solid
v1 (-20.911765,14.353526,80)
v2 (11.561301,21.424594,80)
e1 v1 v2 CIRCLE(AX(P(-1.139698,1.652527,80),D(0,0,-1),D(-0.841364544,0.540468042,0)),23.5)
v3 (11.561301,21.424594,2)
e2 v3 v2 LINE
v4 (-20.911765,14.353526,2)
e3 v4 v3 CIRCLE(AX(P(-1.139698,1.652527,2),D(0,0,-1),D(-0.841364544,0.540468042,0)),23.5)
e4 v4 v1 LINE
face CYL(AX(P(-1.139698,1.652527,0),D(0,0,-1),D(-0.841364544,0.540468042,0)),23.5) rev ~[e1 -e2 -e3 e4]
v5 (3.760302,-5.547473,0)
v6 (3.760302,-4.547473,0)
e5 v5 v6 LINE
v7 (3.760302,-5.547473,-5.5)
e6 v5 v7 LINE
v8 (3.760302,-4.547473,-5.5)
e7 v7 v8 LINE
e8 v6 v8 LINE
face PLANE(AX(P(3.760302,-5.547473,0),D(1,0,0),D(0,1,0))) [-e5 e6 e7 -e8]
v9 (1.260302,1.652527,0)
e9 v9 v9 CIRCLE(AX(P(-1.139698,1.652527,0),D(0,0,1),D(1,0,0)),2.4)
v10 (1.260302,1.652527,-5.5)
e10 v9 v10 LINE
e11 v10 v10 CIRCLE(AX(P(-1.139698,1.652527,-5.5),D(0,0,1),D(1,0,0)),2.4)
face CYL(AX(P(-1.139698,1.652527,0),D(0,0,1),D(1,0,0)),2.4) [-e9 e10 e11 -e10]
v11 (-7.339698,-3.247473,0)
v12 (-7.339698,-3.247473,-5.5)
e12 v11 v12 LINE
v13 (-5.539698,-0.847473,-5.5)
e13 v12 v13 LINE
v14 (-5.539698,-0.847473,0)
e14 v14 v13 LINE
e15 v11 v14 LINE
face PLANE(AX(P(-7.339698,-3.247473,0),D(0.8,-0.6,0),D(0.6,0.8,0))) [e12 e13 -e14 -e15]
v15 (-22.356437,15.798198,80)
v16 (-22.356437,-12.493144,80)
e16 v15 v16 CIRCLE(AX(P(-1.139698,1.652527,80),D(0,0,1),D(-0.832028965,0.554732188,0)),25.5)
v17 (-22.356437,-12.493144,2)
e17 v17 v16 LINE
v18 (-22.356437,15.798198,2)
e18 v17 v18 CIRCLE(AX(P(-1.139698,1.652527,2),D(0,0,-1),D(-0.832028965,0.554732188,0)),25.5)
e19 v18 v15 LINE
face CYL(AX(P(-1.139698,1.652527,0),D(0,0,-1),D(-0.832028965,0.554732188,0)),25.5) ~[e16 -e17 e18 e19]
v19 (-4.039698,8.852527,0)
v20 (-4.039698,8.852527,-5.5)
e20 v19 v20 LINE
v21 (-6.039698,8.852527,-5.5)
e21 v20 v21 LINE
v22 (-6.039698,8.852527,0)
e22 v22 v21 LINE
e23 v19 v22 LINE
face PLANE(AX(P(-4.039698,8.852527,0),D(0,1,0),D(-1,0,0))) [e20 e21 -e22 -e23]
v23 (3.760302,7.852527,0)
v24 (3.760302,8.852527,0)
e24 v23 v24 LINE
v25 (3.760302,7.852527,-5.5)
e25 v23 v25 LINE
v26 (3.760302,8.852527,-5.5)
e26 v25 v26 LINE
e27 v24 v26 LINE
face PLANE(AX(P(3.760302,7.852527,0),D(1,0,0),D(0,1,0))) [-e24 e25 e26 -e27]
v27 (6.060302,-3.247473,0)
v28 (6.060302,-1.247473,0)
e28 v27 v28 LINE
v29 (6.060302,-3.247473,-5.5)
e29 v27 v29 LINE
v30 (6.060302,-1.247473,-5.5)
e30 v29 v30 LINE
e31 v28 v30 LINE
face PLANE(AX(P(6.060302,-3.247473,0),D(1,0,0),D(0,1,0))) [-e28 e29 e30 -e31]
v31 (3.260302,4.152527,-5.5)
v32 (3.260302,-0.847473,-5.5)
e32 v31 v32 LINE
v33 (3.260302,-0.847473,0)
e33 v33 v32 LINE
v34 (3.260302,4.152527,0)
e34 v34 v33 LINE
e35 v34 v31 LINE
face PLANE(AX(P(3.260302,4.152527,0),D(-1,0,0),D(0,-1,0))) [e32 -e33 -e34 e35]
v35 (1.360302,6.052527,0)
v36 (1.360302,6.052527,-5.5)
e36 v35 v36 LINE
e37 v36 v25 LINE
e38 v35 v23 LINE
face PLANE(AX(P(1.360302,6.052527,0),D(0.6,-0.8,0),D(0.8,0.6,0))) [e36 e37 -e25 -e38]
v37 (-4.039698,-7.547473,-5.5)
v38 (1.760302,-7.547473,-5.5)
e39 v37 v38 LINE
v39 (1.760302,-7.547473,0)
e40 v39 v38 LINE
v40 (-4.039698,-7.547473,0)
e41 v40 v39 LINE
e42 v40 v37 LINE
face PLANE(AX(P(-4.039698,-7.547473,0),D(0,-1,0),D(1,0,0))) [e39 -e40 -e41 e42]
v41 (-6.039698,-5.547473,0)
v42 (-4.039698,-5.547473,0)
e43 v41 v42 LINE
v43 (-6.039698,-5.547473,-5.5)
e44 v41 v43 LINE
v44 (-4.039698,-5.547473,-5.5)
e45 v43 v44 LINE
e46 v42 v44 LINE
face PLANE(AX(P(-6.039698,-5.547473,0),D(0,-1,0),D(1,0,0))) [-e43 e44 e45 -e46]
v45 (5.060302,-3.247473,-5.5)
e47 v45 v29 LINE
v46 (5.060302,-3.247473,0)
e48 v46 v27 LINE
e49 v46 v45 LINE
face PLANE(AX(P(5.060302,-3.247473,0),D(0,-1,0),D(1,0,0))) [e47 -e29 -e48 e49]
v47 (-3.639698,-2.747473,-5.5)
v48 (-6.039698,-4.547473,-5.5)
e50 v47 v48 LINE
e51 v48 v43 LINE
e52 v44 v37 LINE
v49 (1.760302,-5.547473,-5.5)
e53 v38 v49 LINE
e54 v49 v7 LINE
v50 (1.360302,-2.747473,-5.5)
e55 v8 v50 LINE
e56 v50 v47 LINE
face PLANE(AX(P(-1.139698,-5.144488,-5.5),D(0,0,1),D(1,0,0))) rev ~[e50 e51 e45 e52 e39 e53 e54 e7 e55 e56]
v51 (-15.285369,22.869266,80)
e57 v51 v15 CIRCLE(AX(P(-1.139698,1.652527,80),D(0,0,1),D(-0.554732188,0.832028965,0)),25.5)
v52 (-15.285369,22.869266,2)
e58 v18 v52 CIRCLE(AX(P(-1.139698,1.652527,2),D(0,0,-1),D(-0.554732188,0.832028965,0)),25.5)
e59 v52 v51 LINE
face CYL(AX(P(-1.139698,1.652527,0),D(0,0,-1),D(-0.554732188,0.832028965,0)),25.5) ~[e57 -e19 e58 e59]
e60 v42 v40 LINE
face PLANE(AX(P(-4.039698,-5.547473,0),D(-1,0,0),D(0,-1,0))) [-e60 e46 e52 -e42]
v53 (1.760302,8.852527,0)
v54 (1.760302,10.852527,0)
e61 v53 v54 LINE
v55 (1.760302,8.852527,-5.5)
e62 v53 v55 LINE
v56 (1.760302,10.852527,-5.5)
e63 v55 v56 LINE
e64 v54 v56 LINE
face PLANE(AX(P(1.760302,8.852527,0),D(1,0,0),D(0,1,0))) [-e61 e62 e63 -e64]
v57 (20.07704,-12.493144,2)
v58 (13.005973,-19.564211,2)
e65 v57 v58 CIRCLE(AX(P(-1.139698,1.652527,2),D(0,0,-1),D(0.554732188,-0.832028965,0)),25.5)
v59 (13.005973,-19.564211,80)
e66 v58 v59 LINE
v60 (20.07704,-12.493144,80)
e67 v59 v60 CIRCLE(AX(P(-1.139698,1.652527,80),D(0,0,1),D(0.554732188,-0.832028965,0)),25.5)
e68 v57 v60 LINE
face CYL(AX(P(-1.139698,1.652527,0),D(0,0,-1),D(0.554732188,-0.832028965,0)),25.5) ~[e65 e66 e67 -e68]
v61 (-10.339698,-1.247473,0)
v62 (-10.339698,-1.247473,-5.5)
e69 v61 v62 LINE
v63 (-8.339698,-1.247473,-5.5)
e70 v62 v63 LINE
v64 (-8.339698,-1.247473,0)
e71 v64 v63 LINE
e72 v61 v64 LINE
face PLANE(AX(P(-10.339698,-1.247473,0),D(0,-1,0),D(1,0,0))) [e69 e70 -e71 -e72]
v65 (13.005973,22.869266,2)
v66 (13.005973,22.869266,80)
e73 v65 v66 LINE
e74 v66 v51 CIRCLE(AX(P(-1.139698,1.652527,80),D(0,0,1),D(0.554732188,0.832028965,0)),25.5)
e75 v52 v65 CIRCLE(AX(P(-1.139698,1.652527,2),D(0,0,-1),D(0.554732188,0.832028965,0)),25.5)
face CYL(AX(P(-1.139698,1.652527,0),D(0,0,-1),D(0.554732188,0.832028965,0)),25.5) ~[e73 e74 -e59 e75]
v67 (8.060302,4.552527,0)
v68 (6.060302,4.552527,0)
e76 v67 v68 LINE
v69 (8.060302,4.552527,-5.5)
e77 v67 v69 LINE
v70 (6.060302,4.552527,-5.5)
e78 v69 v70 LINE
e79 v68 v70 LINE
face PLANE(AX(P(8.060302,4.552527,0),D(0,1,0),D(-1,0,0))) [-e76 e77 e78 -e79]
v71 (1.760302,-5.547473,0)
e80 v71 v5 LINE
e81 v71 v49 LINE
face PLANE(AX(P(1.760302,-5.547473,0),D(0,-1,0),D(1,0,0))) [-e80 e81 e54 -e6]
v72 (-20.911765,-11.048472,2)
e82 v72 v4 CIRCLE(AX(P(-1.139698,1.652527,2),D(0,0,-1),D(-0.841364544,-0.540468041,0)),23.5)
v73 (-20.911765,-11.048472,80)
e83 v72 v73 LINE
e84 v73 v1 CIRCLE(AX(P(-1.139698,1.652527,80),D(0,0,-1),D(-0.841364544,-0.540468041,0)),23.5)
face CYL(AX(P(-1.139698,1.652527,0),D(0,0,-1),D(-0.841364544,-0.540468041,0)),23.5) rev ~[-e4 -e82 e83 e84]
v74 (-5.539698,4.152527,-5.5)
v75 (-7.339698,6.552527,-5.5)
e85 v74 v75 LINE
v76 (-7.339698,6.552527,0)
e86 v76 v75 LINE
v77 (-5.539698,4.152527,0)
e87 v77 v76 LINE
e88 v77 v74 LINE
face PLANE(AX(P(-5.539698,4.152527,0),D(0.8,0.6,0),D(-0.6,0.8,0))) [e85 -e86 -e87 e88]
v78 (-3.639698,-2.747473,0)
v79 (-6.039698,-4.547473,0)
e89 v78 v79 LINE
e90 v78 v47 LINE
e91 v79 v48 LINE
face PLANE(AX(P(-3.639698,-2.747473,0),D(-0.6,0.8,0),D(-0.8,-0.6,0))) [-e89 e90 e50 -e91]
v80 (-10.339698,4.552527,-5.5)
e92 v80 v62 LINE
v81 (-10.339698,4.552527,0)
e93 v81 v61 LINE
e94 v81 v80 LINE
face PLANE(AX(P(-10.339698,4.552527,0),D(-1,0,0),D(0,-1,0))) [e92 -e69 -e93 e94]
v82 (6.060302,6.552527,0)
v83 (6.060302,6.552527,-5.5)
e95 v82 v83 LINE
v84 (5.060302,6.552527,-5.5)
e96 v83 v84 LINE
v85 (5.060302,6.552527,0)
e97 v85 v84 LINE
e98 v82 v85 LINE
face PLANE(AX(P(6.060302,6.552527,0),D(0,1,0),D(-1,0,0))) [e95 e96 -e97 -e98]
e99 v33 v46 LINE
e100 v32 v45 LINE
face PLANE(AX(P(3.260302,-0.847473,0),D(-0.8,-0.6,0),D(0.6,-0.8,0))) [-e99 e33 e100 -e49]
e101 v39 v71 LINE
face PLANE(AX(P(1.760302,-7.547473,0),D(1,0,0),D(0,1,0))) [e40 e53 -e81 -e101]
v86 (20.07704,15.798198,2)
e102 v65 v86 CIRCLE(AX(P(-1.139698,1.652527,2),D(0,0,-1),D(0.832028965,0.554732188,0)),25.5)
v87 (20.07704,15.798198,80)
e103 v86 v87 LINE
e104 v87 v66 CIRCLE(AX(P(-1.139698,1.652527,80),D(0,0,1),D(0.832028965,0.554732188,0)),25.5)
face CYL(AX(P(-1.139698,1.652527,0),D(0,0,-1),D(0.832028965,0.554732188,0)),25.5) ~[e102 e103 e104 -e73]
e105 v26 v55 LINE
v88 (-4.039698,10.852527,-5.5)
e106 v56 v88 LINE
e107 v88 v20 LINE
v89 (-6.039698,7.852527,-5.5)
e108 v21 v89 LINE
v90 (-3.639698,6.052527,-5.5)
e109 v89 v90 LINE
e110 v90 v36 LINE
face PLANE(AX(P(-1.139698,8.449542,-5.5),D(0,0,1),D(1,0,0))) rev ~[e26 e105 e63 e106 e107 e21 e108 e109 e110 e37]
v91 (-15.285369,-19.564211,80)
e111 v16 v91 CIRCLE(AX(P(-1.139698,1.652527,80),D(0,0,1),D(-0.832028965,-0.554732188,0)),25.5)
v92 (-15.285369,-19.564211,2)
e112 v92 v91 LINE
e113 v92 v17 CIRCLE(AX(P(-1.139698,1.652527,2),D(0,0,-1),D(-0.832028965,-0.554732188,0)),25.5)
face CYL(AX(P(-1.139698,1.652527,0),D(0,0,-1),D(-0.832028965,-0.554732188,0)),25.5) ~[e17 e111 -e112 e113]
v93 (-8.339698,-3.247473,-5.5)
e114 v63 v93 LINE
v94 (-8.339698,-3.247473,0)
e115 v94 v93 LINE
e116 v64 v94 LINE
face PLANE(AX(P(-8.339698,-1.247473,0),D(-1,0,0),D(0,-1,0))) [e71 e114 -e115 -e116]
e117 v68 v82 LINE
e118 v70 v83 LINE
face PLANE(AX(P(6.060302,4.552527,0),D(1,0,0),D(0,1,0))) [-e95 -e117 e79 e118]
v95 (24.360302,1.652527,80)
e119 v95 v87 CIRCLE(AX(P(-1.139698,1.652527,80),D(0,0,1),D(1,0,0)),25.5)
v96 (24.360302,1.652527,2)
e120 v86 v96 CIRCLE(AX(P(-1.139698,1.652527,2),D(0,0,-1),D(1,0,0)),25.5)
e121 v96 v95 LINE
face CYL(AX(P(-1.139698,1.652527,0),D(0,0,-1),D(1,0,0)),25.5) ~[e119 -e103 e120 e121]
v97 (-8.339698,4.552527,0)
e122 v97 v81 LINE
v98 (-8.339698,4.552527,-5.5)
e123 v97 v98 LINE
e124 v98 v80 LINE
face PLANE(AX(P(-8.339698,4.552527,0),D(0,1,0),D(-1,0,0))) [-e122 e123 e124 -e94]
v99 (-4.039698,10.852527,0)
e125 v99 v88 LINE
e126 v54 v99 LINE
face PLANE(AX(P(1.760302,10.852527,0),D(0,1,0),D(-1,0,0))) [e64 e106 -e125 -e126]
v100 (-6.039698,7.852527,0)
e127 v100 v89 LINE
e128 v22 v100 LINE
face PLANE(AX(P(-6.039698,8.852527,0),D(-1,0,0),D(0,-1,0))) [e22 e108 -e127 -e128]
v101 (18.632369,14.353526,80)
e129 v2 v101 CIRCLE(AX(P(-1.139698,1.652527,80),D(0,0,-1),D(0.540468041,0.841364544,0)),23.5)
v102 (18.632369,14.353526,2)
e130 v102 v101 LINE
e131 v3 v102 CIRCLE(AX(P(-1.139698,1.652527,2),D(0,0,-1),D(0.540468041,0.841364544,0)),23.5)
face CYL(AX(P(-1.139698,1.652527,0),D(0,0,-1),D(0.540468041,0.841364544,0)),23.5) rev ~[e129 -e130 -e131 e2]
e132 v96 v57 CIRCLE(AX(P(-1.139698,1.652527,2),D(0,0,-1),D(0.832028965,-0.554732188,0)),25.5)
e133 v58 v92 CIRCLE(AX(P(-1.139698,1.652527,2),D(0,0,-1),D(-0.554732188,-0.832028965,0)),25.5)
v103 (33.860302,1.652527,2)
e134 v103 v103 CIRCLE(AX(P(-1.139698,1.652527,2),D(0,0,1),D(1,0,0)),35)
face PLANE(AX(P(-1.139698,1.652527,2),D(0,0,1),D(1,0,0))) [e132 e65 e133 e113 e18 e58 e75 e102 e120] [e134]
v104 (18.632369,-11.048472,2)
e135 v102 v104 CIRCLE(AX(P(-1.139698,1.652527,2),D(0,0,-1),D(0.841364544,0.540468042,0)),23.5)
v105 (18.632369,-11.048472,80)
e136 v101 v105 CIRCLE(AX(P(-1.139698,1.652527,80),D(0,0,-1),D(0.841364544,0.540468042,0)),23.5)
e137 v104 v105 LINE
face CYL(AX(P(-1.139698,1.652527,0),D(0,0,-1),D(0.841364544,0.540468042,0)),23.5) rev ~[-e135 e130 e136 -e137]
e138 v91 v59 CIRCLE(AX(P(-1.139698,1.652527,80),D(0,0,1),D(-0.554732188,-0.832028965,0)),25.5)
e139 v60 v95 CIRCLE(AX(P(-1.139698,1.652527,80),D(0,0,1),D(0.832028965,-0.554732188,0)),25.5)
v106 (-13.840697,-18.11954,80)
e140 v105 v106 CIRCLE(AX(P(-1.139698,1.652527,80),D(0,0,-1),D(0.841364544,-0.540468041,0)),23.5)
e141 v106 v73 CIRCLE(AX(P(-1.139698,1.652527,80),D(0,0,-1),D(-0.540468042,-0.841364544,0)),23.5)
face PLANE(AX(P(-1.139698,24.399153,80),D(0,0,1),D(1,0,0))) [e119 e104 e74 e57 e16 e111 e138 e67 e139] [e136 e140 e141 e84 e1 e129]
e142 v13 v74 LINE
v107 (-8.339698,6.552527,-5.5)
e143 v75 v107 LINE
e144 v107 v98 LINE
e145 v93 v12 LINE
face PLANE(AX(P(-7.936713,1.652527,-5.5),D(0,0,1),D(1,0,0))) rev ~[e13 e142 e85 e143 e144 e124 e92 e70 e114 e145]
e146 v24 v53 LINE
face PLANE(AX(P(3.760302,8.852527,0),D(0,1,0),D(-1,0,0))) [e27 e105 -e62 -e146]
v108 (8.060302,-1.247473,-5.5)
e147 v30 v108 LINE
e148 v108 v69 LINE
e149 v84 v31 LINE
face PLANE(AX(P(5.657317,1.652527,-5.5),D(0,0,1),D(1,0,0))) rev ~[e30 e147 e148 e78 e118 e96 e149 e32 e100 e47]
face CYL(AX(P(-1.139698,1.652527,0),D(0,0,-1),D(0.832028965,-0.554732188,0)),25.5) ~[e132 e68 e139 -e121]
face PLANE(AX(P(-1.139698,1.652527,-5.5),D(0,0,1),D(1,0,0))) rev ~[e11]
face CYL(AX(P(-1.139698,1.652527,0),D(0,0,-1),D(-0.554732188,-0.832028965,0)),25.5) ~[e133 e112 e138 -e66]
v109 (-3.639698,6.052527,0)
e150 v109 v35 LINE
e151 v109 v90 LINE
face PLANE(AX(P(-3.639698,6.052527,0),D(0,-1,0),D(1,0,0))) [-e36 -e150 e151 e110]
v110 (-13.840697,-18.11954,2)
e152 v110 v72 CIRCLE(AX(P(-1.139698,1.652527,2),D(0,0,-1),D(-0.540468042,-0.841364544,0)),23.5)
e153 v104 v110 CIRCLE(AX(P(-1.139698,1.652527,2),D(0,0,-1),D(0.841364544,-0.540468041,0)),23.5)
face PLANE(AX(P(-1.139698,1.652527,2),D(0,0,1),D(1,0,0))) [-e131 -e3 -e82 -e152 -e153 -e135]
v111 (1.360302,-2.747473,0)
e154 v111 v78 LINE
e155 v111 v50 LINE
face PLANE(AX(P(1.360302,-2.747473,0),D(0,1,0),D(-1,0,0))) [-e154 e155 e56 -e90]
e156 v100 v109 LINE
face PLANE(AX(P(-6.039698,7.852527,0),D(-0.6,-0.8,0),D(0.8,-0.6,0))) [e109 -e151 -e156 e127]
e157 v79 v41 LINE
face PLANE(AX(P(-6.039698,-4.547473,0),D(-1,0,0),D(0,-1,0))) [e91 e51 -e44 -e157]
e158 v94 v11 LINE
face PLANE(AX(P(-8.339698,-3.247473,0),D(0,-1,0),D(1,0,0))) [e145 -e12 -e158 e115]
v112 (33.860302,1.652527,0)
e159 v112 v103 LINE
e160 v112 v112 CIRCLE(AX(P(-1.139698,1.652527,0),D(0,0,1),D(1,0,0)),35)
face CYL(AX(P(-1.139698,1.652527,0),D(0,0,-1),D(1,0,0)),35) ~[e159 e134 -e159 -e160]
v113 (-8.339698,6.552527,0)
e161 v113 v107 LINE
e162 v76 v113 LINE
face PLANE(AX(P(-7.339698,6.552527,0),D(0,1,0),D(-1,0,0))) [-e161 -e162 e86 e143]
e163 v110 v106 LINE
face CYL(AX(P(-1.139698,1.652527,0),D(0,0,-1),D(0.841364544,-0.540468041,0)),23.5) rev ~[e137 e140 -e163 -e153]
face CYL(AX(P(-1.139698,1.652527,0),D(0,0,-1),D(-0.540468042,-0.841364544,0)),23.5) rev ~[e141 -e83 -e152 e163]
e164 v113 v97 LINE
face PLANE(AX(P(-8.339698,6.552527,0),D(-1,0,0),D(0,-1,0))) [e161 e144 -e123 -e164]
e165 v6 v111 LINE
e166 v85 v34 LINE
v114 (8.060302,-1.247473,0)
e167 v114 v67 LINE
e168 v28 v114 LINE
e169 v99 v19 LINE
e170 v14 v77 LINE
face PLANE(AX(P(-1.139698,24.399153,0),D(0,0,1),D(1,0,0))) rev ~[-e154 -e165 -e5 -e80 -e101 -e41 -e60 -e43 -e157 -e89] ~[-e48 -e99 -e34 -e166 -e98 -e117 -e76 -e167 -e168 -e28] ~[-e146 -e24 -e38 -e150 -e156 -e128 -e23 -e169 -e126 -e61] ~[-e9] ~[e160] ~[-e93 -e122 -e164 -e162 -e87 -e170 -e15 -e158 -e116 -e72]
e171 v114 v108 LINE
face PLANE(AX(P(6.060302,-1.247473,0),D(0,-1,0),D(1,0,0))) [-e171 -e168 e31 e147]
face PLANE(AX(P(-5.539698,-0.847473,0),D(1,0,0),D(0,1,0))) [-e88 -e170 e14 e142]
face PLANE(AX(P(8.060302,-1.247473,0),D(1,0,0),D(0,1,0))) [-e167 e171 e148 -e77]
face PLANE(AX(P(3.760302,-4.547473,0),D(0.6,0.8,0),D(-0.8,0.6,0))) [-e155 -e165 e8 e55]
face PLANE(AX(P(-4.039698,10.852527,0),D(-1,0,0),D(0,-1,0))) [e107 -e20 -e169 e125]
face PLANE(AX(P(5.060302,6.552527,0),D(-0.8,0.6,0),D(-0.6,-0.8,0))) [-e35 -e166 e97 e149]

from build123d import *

# Parameters (mm, degrees)
F0_R     = 35
F0_R_2   = 2.4
F1_DEPTH = 2
F2_DEPTH = 80
F3_DEPTH = 5.5


# Not quite as in the source:
# - a feature names something its author has since deleted; it is built from what else it names


with BuildPart() as f1:
    # F0 (on Top) → F1 (new body)
    with BuildSketch(Plane.XY):
        with Locations((-1.1396982046, 1.6525272475)):
            Circle(F0_R)
        with BuildLine():
            ThreePointArc((24.3603017954, 1.6525272475), (23.2660064022, -5.7374377488), (20.0770404114, -12.4931435567))
            ThreePointArc((20.0770404114, -12.4931435567), (16.8915247156, -16.3786956728), (13.0059725995, -19.5642113686))
            ThreePointArc((13.0059725995, -19.5642113686), (-1.1396982046, -23.8474727525), (-15.2853690088, -19.5642113686))
            ThreePointArc((-15.2853690088, -19.5642113686), (-19.1709211249, -16.3786956728), (-22.3564368206, -12.4931435567))
            ThreePointArc((-22.3564368206, -12.4931435567), (-26.6396982046, 1.6525272475), (-22.3564368206, 15.7981980516))
            ThreePointArc((-22.3564368206, 15.7981980516), (-19.1709211249, 19.6837501677), (-15.2853690088, 22.8692658635))
            ThreePointArc((-15.2853690088, 22.8692658635), (-1.1396982046, 27.1525272475), (13.0059725995, 22.8692658635))
            ThreePointArc((13.0059725995, 22.8692658635), (16.8915247156, 19.6837501677), (20.0770404114, 15.7981980516))
            ThreePointArc((20.0770404114, 15.7981980516), (23.2660064022, 9.0424922437), (24.3603017954, 1.6525272475))
        make_face(mode=Mode.SUBTRACT)
        with BuildLine():
            ThreePointArc((11.5613007706, -18.1195395396), (15.4773111533, -14.9644821104), (18.6323685824, -11.0484717277))
            ThreePointArc((18.6323685824, -11.0484717277), (21.4090663901, -4.9658725026), (22.3603017954, 1.6525272475))
            ThreePointArc((22.3603017954, 1.6525272475), (21.4090663901, 8.2709269976), (18.6323685824, 14.3535262227))
            ThreePointArc((18.6323685824, 14.3535262227), (15.4773111533, 18.2695366053), (11.5613007706, 21.4245940345))
            ThreePointArc((11.5613007706, 21.4245940345), (-1.1396982046, 25.1525272475), (-13.8406971798, 21.4245940345))
            ThreePointArc((-13.8406971798, 21.4245940345), (-17.7567075625, 18.2695366053), (-20.9117649917, 14.3535262227))
            ThreePointArc((-20.9117649917, 14.3535262227), (-24.6396982046, 1.6525272475), (-20.9117649917, -11.0484717277))
            ThreePointArc((-20.9117649917, -11.0484717277), (-17.7567075625, -14.9644821104), (-13.8406971798, -18.1195395396))
            ThreePointArc((-13.8406971798, -18.1195395396), (-1.1396982046, -21.8474727525), (11.5613007706, -18.1195395396))
        make_face()
        Polygon((1.7603017954, -5.5474727525), (1.7603017954, -7.5474727525), (-4.0396982046, -7.5474727525), (-4.0396982046, -5.5474727525), (-6.0396982046, -5.5474727525), (-6.0396982046, -4.5474727525), (-3.6396982046, -2.7474727525), (1.3603017954, -2.7474727525), (3.7603017954, -4.5474727525), (3.7603017954, -5.5474727525), align=None, mode=Mode.SUBTRACT)
        Polygon((-8.3396982046, -1.2474727525), (-10.3396982046, -1.2474727525), (-10.3396982046, 4.5525272475), (-8.3396982046, 4.5525272475), (-8.3396982046, 6.5525272475), (-7.3396982046, 6.5525272475), (-5.5396982046, 4.1525272475), (-5.5396982046, -0.8474727525), (-7.3396982046, -3.2474727525), (-8.3396982046, -3.2474727525), align=None, mode=Mode.SUBTRACT)
        Polygon((1.7603017954, 8.8525272475), (3.7603017954, 8.8525272475), (3.7603017954, 7.8525272475), (1.3603017954, 6.0525272475), (-3.6396982046, 6.0525272475), (-6.0396982046, 7.8525272475), (-6.0396982046, 8.8525272475), (-4.0396982046, 8.8525272475), (-4.0396982046, 10.8525272475), (1.7603017954, 10.8525272475), align=None, mode=Mode.SUBTRACT)
        with Locations((-1.1396982046, 1.6525272475)):
            Circle(F0_R_2, mode=Mode.SUBTRACT)
        Polygon((5.0603017954, -3.2474727525), (3.2603017954, -0.8474727525), (3.2603017954, 4.1525272475), (5.0603017954, 6.5525272475), (6.0603017954, 6.5525272475), (6.0603017954, 4.5525272475), (8.0603017954, 4.5525272475), (8.0603017954, -1.2474727525), (6.0603017954, -1.2474727525), (6.0603017954, -3.2474727525), align=None, mode=Mode.SUBTRACT)
        with BuildLine():
            Line((18.6323685824, -11.0484717277), (20.0770404114, -12.4931435567))
            ThreePointArc((20.0770404114, -12.4931435567), (23.2660064022, -5.7374377488), (24.3603017954, 1.6525272475))
            ThreePointArc((24.3603017954, 1.6525272475), (23.2660064022, 9.0424922437), (20.0770404114, 15.7981980516))
            Line((20.0770404114, 15.7981980516), (18.6323685824, 14.3535262227))
            ThreePointArc((18.6323685824, 14.3535262227), (21.4090663901, 8.2709269976), (22.3603017954, 1.6525272475))
            ThreePointArc((22.3603017954, 1.6525272475), (21.4090663901, -4.9658725026), (18.6323685824, -11.0484717277))
        make_face()
        with BuildLine():
            ThreePointArc((-15.2853690088, -19.5642113686), (-1.1396982046, -23.8474727525), (13.0059725995, -19.5642113686))
            Line((13.0059725995, -19.5642113686), (11.5613007706, -18.1195395396))
            ThreePointArc((11.5613007706, -18.1195395396), (-1.1396982046, -21.8474727525), (-13.8406971798, -18.1195395396))
            Line((-13.8406971798, -18.1195395396), (-15.2853690088, -19.5642113686))
        make_face()
        with BuildLine():
            Line((11.5613007706, 21.4245940345), (13.0059725995, 22.8692658635))
            ThreePointArc((13.0059725995, 22.8692658635), (-1.1396982046, 27.1525272475), (-15.2853690088, 22.8692658635))
            Line((-15.2853690088, 22.8692658635), (-13.8406971798, 21.4245940345))
            ThreePointArc((-13.8406971798, 21.4245940345), (-1.1396982046, 25.1525272475), (11.5613007706, 21.4245940345))
        make_face()
        with BuildLine():
            ThreePointArc((-22.3564368206, 15.7981980516), (-26.6396982046, 1.6525272475), (-22.3564368206, -12.4931435567))
            Line((-22.3564368206, -12.4931435567), (-20.9117649917, -11.0484717277))
            ThreePointArc((-20.9117649917, -11.0484717277), (-24.6396982046, 1.6525272475), (-20.9117649917, 14.3535262227))
            Line((-20.9117649917, 14.3535262227), (-22.3564368206, 15.7981980516))
        make_face()
        Polygon((-10.3396982046, 4.5525272475), (-10.3396982046, -1.2474727525), (-8.3396982046, -1.2474727525), (-8.3396982046, -3.2474727525), (-7.3396982046, -3.2474727525), (-5.5396982046, -0.8474727525), (-5.5396982046, 4.1525272475), (-7.3396982046, 6.5525272475), (-8.3396982046, 6.5525272475), (-8.3396982046, 4.5525272475), align=None)
        Polygon((3.2603017954, 4.1525272475), (3.2603017954, -0.8474727525), (5.0603017954, -3.2474727525), (6.0603017954, -3.2474727525), (6.0603017954, -1.2474727525), (8.0603017954, -1.2474727525), (8.0603017954, 4.5525272475), (6.0603017954, 4.5525272475), (6.0603017954, 6.5525272475), (5.0603017954, 6.5525272475), align=None)
        Polygon((-4.0396982046, -7.5474727525), (1.7603017954, -7.5474727525), (1.7603017954, -5.5474727525), (3.7603017954, -5.5474727525), (3.7603017954, -4.5474727525), (1.3603017954, -2.7474727525), (-3.6396982046, -2.7474727525), (-6.0396982046, -4.5474727525), (-6.0396982046, -5.5474727525), (-4.0396982046, -5.5474727525), align=None)
        Polygon((3.7603017954, 7.8525272475), (3.7603017954, 8.8525272475), (1.7603017954, 8.8525272475), (1.7603017954, 10.8525272475), (-4.0396982046, 10.8525272475), (-4.0396982046, 8.8525272475), (-6.0396982046, 8.8525272475), (-6.0396982046, 7.8525272475), (-3.6396982046, 6.0525272475), (1.3603017954, 6.0525272475), align=None)
        with BuildLine():
            ThreePointArc((13.0059725995, -19.5642113686), (16.8915247156, -16.3786956728), (20.0770404114, -12.4931435567))
            Line((20.0770404114, -12.4931435567), (18.6323685824, -11.0484717277))
            ThreePointArc((18.6323685824, -11.0484717277), (15.4773111533, -14.9644821104), (11.5613007706, -18.1195395396))
            Line((11.5613007706, -18.1195395396), (13.0059725995, -19.5642113686))
        make_face()
        with BuildLine():
            Line((18.6323685824, 14.3535262227), (20.0770404114, 15.7981980516))
            ThreePointArc((20.0770404114, 15.7981980516), (16.8915247156, 19.6837501677), (13.0059725995, 22.8692658635))
            Line((13.0059725995, 22.8692658635), (11.5613007706, 21.4245940345))
            ThreePointArc((11.5613007706, 21.4245940345), (15.4773111533, 18.2695366053), (18.6323685824, 14.3535262227))
        make_face()
        with BuildLine():
            ThreePointArc((-22.3564368206, -12.4931435567), (-19.1709211249, -16.3786956728), (-15.2853690088, -19.5642113686))
            Line((-15.2853690088, -19.5642113686), (-13.8406971798, -18.1195395396))
            ThreePointArc((-13.8406971798, -18.1195395396), (-17.7567075625, -14.9644821104), (-20.9117649917, -11.0484717277))
            Line((-20.9117649917, -11.0484717277), (-22.3564368206, -12.4931435567))
        make_face()
        with BuildLine():
            Line((-13.8406971798, 21.4245940345), (-15.2853690088, 22.8692658635))
            ThreePointArc((-15.2853690088, 22.8692658635), (-19.1709211249, 19.6837501677), (-22.3564368206, 15.7981980516))
            Line((-22.3564368206, 15.7981980516), (-20.9117649917, 14.3535262227))
            ThreePointArc((-20.9117649917, 14.3535262227), (-17.7567075625, 18.2695366053), (-13.8406971798, 21.4245940345))
        make_face()
        with Locations((-1.1396982046, 1.6525272475)):
            Circle(F0_R_2)
    extrude(amount=F1_DEPTH)

    # F0 (on Top) → F2 (join)
    with BuildSketch(Plane.XY):
        with BuildLine():
            Line((11.5613007706, 21.4245940345), (13.0059725995, 22.8692658635))
            ThreePointArc((13.0059725995, 22.8692658635), (-1.1396982046, 27.1525272475), (-15.2853690088, 22.8692658635))
            Line((-15.2853690088, 22.8692658635), (-13.8406971798, 21.4245940345))
            ThreePointArc((-13.8406971798, 21.4245940345), (-1.1396982046, 25.1525272475), (11.5613007706, 21.4245940345))
        make_face()
        with BuildLine():
            ThreePointArc((-22.3564368206, 15.7981980516), (-26.6396982046, 1.6525272475), (-22.3564368206, -12.4931435567))
            Line((-22.3564368206, -12.4931435567), (-20.9117649917, -11.0484717277))
            ThreePointArc((-20.9117649917, -11.0484717277), (-24.6396982046, 1.6525272475), (-20.9117649917, 14.3535262227))
            Line((-20.9117649917, 14.3535262227), (-22.3564368206, 15.7981980516))
        make_face()
        with BuildLine():
            ThreePointArc((-15.2853690088, -19.5642113686), (-1.1396982046, -23.8474727525), (13.0059725995, -19.5642113686))
            Line((13.0059725995, -19.5642113686), (11.5613007706, -18.1195395396))
            ThreePointArc((11.5613007706, -18.1195395396), (-1.1396982046, -21.8474727525), (-13.8406971798, -18.1195395396))
            Line((-13.8406971798, -18.1195395396), (-15.2853690088, -19.5642113686))
        make_face()
        with BuildLine():
            Line((18.6323685824, -11.0484717277), (20.0770404114, -12.4931435567))
            ThreePointArc((20.0770404114, -12.4931435567), (23.2660064022, -5.7374377488), (24.3603017954, 1.6525272475))
            ThreePointArc((24.3603017954, 1.6525272475), (23.2660064022, 9.0424922437), (20.0770404114, 15.7981980516))
            Line((20.0770404114, 15.7981980516), (18.6323685824, 14.3535262227))
            ThreePointArc((18.6323685824, 14.3535262227), (21.4090663901, 8.2709269976), (22.3603017954, 1.6525272475))
            ThreePointArc((22.3603017954, 1.6525272475), (21.4090663901, -4.9658725026), (18.6323685824, -11.0484717277))
        make_face()
        with BuildLine():
            ThreePointArc((13.0059725995, -19.5642113686), (16.8915247156, -16.3786956728), (20.0770404114, -12.4931435567))
            Line((20.0770404114, -12.4931435567), (18.6323685824, -11.0484717277))
            ThreePointArc((18.6323685824, -11.0484717277), (15.4773111533, -14.9644821104), (11.5613007706, -18.1195395396))
            Line((11.5613007706, -18.1195395396), (13.0059725995, -19.5642113686))
        make_face()
        with BuildLine():
            Line((18.6323685824, 14.3535262227), (20.0770404114, 15.7981980516))
            ThreePointArc((20.0770404114, 15.7981980516), (16.8915247156, 19.6837501677), (13.0059725995, 22.8692658635))
            Line((13.0059725995, 22.8692658635), (11.5613007706, 21.4245940345))
            ThreePointArc((11.5613007706, 21.4245940345), (15.4773111533, 18.2695366053), (18.6323685824, 14.3535262227))
        make_face()
        with BuildLine():
            Line((-13.8406971798, 21.4245940345), (-15.2853690088, 22.8692658635))
            ThreePointArc((-15.2853690088, 22.8692658635), (-19.1709211249, 19.6837501677), (-22.3564368206, 15.7981980516))
            Line((-22.3564368206, 15.7981980516), (-20.9117649917, 14.3535262227))
            ThreePointArc((-20.9117649917, 14.3535262227), (-17.7567075625, 18.2695366053), (-13.8406971798, 21.4245940345))
        make_face()
        with BuildLine():
            ThreePointArc((-22.3564368206, -12.4931435567), (-19.1709211249, -16.3786956728), (-15.2853690088, -19.5642113686))
            Line((-15.2853690088, -19.5642113686), (-13.8406971798, -18.1195395396))
            ThreePointArc((-13.8406971798, -18.1195395396), (-17.7567075625, -14.9644821104), (-20.9117649917, -11.0484717277))
            Line((-20.9117649917, -11.0484717277), (-22.3564368206, -12.4931435567))
        make_face()
    extrude(amount=F2_DEPTH)

    # F0 (on Top) → F3 (join)
    with BuildSketch(Plane.XY):
        Polygon((-10.3396982046, 4.5525272475), (-10.3396982046, -1.2474727525), (-8.3396982046, -1.2474727525), (-8.3396982046, -3.2474727525), (-7.3396982046, -3.2474727525), (-5.5396982046, -0.8474727525), (-5.5396982046, 4.1525272475), (-7.3396982046, 6.5525272475), (-8.3396982046, 6.5525272475), (-8.3396982046, 4.5525272475), align=None)
        Polygon((3.2603017954, 4.1525272475), (3.2603017954, -0.8474727525), (5.0603017954, -3.2474727525), (6.0603017954, -3.2474727525), (6.0603017954, -1.2474727525), (8.0603017954, -1.2474727525), (8.0603017954, 4.5525272475), (6.0603017954, 4.5525272475), (6.0603017954, 6.5525272475), (5.0603017954, 6.5525272475), align=None)
        Polygon((-4.0396982046, -7.5474727525), (1.7603017954, -7.5474727525), (1.7603017954, -5.5474727525), (3.7603017954, -5.5474727525), (3.7603017954, -4.5474727525), (1.3603017954, -2.7474727525), (-3.6396982046, -2.7474727525), (-6.0396982046, -4.5474727525), (-6.0396982046, -5.5474727525), (-4.0396982046, -5.5474727525), align=None)
        Polygon((3.7603017954, 7.8525272475), (3.7603017954, 8.8525272475), (1.7603017954, 8.8525272475), (1.7603017954, 10.8525272475), (-4.0396982046, 10.8525272475), (-4.0396982046, 8.8525272475), (-6.0396982046, 8.8525272475), (-6.0396982046, 7.8525272475), (-3.6396982046, 6.0525272475), (1.3603017954, 6.0525272475), align=None)
        with Locations((-1.1396982046, 1.6525272475)):
            Circle(F0_R_2)
    extrude(amount=-F3_DEPTH)


solid = f1.part
